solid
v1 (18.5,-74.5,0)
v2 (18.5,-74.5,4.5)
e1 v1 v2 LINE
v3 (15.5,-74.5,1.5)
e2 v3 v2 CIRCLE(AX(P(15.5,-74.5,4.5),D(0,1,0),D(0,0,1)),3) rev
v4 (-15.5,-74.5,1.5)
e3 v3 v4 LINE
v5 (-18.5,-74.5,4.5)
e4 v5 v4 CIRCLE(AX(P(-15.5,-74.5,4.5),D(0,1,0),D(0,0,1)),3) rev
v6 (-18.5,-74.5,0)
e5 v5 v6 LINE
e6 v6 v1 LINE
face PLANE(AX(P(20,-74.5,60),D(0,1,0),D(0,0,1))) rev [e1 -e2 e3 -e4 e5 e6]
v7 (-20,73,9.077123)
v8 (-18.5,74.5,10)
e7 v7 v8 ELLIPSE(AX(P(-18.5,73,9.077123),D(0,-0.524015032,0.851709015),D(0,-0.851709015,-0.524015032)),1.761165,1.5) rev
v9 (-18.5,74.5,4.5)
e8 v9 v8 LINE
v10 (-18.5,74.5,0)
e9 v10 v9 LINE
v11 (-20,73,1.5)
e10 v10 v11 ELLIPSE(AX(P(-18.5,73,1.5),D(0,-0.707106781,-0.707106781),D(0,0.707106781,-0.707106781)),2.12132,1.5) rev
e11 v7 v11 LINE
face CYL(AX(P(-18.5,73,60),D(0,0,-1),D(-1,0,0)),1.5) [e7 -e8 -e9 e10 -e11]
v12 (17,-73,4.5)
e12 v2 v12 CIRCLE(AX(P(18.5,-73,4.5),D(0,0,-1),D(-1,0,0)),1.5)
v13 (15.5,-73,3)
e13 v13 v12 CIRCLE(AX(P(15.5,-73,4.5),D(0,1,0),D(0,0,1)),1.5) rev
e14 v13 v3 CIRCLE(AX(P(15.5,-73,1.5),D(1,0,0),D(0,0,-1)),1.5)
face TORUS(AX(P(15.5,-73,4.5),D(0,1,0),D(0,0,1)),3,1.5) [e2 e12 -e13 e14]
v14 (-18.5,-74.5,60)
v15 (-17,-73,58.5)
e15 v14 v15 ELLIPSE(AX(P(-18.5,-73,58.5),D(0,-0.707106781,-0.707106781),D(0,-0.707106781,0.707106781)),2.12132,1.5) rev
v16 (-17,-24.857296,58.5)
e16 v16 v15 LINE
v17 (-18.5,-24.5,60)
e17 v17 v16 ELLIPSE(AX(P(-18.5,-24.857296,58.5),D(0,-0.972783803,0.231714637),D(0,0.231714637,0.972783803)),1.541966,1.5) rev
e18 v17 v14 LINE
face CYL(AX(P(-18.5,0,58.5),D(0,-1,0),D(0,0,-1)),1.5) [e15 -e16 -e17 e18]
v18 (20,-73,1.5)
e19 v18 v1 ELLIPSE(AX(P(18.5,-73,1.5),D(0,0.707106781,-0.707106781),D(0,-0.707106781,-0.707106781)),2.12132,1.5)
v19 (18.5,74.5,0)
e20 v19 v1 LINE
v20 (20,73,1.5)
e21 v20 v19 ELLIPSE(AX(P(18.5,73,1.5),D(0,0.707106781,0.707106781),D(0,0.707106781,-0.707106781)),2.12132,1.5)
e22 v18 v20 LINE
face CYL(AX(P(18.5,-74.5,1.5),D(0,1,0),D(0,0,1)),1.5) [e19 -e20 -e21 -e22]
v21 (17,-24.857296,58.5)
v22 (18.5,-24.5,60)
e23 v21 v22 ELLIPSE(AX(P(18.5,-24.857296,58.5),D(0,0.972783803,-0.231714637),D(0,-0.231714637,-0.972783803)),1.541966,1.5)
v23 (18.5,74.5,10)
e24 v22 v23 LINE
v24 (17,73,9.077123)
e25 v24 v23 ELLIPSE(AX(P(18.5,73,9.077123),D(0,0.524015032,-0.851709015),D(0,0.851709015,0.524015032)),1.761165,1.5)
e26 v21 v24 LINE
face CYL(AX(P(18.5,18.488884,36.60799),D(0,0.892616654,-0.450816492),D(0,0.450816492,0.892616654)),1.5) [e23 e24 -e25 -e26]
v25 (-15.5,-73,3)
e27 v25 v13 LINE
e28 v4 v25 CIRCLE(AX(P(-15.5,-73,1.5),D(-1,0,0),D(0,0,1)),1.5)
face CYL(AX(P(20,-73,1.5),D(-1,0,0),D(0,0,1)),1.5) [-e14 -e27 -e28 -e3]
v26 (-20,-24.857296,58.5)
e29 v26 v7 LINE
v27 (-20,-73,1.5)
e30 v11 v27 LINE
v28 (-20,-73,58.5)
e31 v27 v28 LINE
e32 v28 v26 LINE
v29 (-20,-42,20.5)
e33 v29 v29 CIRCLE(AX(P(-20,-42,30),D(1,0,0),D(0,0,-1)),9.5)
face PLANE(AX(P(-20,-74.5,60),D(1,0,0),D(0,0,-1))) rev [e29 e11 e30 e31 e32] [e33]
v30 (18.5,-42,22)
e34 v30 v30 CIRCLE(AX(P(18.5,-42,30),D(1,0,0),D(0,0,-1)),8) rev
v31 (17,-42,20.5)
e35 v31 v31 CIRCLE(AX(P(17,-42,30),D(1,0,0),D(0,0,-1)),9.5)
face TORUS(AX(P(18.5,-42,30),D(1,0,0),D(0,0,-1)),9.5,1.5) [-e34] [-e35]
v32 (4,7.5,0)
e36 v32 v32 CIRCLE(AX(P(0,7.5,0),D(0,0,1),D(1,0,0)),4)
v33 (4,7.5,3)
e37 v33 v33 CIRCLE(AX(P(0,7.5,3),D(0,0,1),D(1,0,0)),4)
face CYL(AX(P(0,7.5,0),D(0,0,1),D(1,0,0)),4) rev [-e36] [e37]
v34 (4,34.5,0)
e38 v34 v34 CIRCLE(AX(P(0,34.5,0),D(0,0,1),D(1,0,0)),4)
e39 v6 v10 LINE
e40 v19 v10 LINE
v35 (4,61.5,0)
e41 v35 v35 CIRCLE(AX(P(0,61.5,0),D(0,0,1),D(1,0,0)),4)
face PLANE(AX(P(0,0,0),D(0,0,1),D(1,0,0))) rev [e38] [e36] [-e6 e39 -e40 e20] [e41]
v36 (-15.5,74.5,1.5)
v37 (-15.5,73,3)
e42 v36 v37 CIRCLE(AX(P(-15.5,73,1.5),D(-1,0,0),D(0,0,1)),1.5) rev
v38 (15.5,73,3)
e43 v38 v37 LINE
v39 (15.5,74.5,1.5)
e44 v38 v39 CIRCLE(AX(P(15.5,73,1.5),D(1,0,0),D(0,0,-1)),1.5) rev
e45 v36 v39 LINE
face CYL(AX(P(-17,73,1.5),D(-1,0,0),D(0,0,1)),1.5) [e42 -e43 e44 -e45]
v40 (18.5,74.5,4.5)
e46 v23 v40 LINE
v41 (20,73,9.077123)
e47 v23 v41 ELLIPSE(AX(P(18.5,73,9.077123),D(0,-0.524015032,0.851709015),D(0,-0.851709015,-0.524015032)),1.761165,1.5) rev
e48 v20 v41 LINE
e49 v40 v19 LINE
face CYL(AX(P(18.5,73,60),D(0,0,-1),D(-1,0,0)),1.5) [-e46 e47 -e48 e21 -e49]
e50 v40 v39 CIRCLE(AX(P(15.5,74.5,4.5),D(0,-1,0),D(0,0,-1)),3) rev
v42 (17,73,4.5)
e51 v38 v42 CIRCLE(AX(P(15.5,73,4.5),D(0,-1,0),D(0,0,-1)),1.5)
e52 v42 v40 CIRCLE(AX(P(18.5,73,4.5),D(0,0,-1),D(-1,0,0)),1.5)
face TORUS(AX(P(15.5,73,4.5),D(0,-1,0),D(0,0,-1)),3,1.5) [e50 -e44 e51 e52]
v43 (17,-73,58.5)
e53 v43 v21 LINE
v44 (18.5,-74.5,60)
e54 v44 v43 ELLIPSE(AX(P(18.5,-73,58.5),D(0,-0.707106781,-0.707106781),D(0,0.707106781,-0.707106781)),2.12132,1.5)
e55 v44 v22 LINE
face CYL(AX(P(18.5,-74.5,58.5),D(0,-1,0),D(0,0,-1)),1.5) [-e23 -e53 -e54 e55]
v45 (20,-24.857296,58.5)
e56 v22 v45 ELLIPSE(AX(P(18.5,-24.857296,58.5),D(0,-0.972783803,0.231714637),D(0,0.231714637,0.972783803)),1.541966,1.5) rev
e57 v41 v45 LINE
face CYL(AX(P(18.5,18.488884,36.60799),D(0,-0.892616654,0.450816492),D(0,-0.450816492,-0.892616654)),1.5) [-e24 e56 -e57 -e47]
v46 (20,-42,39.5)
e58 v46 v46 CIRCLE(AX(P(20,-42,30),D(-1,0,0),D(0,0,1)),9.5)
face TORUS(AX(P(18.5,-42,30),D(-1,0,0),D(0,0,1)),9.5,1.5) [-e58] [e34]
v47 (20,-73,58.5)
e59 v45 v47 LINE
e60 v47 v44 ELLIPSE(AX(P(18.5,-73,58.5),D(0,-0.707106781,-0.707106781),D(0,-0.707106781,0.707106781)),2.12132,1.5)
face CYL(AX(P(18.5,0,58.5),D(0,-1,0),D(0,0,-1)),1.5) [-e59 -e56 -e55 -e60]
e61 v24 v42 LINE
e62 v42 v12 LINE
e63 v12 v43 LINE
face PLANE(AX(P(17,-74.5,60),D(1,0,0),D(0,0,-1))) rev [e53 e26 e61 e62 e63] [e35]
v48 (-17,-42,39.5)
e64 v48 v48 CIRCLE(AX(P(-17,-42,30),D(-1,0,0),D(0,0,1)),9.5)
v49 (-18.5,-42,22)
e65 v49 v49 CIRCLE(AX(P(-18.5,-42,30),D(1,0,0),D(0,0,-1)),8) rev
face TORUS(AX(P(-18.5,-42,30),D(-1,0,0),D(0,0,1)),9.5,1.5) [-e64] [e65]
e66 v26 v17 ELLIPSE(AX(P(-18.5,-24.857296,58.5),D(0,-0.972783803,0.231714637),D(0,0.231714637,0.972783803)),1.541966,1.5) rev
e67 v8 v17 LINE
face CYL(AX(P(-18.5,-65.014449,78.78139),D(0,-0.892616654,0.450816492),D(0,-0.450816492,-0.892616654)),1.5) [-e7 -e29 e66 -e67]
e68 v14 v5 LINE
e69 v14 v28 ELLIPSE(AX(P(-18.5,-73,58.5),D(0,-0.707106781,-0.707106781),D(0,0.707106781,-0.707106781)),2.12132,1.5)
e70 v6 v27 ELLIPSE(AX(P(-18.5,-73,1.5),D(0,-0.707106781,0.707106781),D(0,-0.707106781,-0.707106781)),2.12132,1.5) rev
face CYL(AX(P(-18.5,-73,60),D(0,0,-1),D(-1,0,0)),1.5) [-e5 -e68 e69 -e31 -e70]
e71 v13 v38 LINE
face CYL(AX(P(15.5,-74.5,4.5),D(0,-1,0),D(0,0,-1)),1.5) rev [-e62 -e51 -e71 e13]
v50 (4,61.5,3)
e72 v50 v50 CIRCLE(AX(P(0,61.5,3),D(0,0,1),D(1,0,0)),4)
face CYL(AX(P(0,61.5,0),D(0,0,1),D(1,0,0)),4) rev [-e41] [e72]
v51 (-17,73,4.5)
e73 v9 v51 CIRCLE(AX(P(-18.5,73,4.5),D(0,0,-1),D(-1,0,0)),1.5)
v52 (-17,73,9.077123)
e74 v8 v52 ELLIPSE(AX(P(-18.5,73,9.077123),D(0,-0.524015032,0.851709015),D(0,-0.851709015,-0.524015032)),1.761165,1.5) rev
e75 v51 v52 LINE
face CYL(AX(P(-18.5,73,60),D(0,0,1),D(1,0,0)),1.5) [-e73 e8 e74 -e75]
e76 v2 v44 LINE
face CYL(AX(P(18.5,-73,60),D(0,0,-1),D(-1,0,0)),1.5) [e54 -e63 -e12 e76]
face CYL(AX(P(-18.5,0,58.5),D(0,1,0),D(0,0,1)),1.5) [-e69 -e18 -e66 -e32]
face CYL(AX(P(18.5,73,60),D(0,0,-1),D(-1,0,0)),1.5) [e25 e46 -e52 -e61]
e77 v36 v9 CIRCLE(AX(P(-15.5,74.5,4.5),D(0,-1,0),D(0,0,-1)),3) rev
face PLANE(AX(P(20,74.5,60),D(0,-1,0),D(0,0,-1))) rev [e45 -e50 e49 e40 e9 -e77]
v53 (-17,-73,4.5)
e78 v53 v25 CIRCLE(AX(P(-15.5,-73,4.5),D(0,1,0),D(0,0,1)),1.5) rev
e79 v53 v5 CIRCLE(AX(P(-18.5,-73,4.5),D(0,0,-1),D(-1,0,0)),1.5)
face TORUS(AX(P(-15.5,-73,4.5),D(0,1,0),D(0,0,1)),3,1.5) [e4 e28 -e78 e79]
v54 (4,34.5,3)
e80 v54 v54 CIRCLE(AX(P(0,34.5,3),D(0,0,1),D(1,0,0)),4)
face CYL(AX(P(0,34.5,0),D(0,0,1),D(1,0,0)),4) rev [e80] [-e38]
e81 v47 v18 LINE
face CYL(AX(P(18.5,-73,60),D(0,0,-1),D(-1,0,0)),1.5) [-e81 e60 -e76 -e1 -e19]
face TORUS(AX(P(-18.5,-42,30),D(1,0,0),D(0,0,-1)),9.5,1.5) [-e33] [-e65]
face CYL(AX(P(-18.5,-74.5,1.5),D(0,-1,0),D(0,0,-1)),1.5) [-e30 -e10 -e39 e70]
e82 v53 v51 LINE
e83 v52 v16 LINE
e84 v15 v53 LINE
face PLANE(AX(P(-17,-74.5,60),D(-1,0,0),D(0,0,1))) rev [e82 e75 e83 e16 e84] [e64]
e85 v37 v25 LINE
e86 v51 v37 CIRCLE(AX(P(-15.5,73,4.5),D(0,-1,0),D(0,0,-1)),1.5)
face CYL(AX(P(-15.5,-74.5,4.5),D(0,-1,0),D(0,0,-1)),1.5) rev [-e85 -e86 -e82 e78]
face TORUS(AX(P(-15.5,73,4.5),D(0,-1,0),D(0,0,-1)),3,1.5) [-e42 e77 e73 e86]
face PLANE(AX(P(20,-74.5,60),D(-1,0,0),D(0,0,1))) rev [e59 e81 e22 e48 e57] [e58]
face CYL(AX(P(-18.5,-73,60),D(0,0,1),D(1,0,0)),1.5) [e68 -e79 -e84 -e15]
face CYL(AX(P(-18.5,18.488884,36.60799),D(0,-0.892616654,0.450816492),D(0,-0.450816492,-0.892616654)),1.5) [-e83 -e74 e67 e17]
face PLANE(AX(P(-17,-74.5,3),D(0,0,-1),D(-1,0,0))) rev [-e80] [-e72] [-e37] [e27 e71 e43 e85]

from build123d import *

# Parameters (mm, degrees)
SZKIC1_W                    = 40
SZKIC1_H                    = 149
DODANIE_WYCI_GNI_CIE1_DEPTH = 60
SZKIC2_W                    = 34
SZKIC2_H                    = 57
WYTNIJ_WYCI_GNI_CIE1_DEPTH  = 162.867229543
SZKIC4_R                    = 8
WYTNIJ_WYCI_GNI_CIE2_DEPTH  = 45
SZKIC5_R                    = 4
WYTNIJ_WYCI_GNI_CIE3_DEPTH  = 96.912720741
ZAOKR_GLENIE1_R             = 1.5


with BuildPart() as part:
    # Szkic1 → Dodanie-wyciągnięcie1 (new body)
    with BuildSketch(Plane.XY):
        Rectangle(SZKIC1_W, SZKIC1_H)
    extrude(amount=DODANIE_WYCI_GNI_CIE1_DEPTH)

    # Szkic2 → Wytnij-wyciągnięcie1 (cut, through all)
    with BuildSketch(Plane(origin=(0, 74.5, 0), x_dir=(1, 0, 0), z_dir=(0, 1, 0))):
        with Locations((0, -31.5)):
            Rectangle(SZKIC2_W, SZKIC2_H)
    extrude(amount=-WYTNIJ_WYCI_GNI_CIE1_DEPTH, mode=Mode.SUBTRACT)

    # Szkic4 → Wytnij-wyciągnięcie2 (cut)
    with BuildSketch(Plane.ZY.offset(20)):
        Polygon((10, 74.5), (60, -24.5), (60, 74.5), align=None)
        with Locations((30, -42)):
            Circle(SZKIC4_R)
    extrude(amount=-WYTNIJ_WYCI_GNI_CIE2_DEPTH, mode=Mode.SUBTRACT)

    # Szkic5 → Wytnij-wyciągnięcie3 (cut, through all)
    with BuildSketch(Plane.XY.offset(3)):
        with Locations((0, 61.5)):
            Circle(SZKIC5_R)
        with Locations((0, 34.5)):
            Circle(SZKIC5_R)
        with Locations((0, 7.5)):
            Circle(SZKIC5_R)
    extrude(amount=-WYTNIJ_WYCI_GNI_CIE3_DEPTH, mode=Mode.SUBTRACT)

    # Zaokrąglenie1
    zaokr_glenie1_edges = [part.edges().sort_by_distance(p)[0] for p in [
        (0, 74.5, 3),
        (0, -74.5, 3),
        (20, 74.5, 5),
        (20, 0, 0),
        (20, -74.5, 30),
        (20, -49.5, 60),
        (20, 25, 35),
        (20, -42, 22),
        (17, -49.5, 60),
        (17, -74.5, 31.5),
        (17, 0, 3),
        (17, 74.5, 6.5),
        (17, 25, 35),
        (17, -42, 22),
        (-17, 74.5, 6.5),
        (-17, 0, 3),
        (-17, -74.5, 31.5),
        (-17, -49.5, 60),
        (-17, 25, 35),
        (-17, -42, 22),
        (-20, -49.5, 60),
        (-20, -74.5, 30),
        (-20, 0, 0),
        (-20, 74.5, 5),
        (-20, 25, 35),
        (-20, -42, 22),
    ]]
    fillet(zaokr_glenie1_edges, radius=ZAOKR_GLENIE1_R - 0.0001)  # a hair under: the kernel refuses the full size


solid = part.part
